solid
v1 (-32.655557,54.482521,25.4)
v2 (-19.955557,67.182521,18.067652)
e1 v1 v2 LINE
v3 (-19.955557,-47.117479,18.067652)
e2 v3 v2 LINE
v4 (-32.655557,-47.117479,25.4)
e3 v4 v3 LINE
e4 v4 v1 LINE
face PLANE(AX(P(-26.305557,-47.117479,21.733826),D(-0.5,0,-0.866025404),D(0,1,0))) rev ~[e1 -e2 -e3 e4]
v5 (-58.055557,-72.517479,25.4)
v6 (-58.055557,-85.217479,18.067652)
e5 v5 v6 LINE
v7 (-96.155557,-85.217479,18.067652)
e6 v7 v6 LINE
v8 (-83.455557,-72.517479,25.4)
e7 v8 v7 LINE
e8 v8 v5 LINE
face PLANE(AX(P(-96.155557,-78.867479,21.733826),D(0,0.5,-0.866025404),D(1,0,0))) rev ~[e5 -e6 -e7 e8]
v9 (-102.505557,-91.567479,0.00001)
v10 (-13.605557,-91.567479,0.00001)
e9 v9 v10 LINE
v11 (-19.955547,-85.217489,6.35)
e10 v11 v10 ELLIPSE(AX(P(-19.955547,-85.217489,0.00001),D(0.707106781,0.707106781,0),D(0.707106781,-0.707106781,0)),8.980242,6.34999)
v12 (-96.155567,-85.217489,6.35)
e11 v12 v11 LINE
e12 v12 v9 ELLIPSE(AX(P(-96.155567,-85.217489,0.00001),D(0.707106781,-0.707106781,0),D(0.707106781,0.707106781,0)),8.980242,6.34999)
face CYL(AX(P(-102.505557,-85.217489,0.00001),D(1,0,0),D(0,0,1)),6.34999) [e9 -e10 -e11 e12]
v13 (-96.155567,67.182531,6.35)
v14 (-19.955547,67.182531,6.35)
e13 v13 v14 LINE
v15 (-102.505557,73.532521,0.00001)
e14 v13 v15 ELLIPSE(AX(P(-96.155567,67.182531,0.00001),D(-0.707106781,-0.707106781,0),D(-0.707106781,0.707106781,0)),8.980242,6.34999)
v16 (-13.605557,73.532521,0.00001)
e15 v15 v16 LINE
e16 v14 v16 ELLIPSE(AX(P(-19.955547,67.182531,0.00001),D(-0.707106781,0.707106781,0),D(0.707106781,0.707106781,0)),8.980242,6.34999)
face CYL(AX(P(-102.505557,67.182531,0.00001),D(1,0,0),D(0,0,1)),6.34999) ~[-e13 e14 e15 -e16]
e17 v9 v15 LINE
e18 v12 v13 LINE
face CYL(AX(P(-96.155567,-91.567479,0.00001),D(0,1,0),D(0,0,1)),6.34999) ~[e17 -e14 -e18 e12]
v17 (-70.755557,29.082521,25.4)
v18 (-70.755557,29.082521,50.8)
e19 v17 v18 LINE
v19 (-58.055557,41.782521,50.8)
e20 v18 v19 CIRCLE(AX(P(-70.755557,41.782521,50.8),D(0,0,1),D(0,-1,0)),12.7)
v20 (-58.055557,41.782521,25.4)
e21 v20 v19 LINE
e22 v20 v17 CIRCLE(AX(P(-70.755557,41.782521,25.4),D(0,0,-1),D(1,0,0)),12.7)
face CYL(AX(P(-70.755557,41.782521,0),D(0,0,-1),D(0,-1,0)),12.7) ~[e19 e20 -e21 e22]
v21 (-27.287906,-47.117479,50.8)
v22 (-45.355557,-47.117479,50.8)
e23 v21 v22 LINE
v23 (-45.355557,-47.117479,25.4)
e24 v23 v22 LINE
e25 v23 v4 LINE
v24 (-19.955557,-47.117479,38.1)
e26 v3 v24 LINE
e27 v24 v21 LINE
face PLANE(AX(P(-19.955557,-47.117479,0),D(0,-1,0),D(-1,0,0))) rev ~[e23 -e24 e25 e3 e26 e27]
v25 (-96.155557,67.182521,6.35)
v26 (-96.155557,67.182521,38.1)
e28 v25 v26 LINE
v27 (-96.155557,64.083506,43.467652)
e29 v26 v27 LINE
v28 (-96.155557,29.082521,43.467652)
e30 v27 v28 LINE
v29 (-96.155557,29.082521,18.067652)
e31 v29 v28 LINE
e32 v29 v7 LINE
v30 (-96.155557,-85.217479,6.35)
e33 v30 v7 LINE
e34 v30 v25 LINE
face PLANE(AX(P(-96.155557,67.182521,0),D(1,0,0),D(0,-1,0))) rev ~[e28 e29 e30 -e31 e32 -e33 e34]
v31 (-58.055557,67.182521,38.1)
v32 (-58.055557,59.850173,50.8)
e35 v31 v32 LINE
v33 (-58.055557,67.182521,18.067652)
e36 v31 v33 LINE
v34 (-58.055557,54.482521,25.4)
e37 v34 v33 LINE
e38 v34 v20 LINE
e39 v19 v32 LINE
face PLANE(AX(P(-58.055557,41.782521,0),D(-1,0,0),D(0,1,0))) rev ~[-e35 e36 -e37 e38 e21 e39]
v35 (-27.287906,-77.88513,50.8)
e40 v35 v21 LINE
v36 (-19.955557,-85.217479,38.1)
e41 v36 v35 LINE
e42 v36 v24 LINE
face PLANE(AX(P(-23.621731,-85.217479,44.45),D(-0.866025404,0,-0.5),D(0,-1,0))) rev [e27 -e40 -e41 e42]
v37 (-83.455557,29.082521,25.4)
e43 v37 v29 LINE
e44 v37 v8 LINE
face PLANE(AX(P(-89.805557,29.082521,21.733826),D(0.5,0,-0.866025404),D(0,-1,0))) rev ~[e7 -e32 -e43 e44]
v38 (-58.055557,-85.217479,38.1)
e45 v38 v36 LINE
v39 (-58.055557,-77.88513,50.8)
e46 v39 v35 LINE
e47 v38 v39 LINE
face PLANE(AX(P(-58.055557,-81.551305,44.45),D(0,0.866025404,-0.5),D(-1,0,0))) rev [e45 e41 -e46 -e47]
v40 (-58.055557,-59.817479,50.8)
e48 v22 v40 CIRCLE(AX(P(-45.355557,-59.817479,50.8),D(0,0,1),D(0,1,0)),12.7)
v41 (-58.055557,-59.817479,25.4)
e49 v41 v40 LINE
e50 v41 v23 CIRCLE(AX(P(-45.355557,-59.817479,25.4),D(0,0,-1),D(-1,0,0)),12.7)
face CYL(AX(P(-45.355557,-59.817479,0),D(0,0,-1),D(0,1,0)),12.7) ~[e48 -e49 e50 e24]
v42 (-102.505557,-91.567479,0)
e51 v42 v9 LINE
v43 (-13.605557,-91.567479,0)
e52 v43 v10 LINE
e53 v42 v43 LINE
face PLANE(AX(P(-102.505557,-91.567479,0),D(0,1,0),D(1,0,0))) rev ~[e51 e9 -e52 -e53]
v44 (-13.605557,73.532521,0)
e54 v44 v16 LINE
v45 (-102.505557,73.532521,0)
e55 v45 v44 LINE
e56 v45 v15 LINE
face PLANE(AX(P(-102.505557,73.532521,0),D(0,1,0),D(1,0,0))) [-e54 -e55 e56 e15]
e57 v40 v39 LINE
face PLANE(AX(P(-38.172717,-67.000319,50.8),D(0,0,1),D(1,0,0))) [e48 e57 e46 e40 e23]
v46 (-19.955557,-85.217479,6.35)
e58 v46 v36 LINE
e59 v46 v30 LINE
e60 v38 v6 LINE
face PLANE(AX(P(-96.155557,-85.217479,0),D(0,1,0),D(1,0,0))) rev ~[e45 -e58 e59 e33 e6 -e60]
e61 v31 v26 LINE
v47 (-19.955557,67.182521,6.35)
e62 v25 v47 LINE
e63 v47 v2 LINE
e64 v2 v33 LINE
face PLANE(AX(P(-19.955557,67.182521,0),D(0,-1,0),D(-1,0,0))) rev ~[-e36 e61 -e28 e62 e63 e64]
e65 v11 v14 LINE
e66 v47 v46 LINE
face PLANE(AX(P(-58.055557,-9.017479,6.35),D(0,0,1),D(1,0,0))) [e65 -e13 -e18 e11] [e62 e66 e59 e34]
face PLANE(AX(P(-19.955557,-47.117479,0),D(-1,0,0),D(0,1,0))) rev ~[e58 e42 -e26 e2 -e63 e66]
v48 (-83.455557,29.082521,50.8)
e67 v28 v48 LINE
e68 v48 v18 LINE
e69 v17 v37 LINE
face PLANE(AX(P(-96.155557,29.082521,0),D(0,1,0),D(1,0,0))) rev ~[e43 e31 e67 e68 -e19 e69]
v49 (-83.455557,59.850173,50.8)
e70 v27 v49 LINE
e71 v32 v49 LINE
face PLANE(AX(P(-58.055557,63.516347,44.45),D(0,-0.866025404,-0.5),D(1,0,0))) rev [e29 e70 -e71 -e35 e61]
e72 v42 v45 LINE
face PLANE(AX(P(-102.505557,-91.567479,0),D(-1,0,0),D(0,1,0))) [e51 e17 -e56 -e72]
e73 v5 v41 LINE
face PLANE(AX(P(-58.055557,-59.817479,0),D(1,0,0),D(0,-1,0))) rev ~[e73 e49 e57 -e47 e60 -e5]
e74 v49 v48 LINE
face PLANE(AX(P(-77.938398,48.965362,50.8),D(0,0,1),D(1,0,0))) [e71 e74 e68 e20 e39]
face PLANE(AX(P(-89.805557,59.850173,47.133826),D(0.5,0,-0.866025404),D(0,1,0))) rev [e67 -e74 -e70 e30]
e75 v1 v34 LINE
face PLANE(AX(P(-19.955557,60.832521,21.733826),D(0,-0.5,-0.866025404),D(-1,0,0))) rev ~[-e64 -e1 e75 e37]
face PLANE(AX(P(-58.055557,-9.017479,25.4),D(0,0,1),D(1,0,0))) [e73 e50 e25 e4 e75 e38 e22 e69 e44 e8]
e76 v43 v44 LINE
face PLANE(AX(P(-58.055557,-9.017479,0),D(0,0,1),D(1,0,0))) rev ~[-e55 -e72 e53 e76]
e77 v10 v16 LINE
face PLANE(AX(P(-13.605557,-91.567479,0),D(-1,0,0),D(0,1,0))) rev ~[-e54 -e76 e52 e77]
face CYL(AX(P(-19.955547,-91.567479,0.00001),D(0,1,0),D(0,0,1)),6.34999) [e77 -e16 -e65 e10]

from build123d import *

# Parameters (mm, degrees)
F1_DEPTH    = 50.8
F2_DEPTH    = 25.4
F0_W        = 88.9
F0_H        = 165.1
F3_DEPTH    = 6.35
F4_SIZE2    = 7.3323484187
F4_SIZE     = 12.7
F5_C1_SIZE2 = 7.3323484187
F5_C1_SIZE  = 12.7
F5_C2_SIZE2 = 7.3323484187
F5_C2_SIZE  = 12.7
F5_C3_SIZE2 = 12.7
F5_C3_SIZE  = 7.3323484187
F5_C4_SIZE2 = 7.3323484187
F5_C4_SIZE  = 12.7
F6_R        = 6.34999


# Not quite as in the source:
# - a fillet or chamfer is up to 0.001 mm smaller than in the source, because OpenCascade refuses the exact size


with BuildPart() as f1:
    # F0 (on Top) → F1 (new body)
    with BuildSketch(Plane.XY):
        with BuildLine():
            Line((-19.9555572391, -85.2174787462), (-19.9555572391, -47.1174787462))
            Line((-19.9555572391, -47.1174787462), (-45.3555572391, -47.1174787462))
            ThreePointArc((-45.3555572391, -47.1174787462), (-54.3358133601, -50.8372226251), (-58.0555572391, -59.8174787462))
            Line((-58.0555572391, -59.8174787462), (-58.0555572391, -85.2174787462))
            Line((-58.0555572391, -85.2174787462), (-19.9555572391, -85.2174787462))
        make_face()
    extrude(amount=F1_DEPTH)



with BuildPart() as f1b:
    # F0 (on Top) → F1, piece 2 (new body)
    with BuildSketch(Plane.XY):
        with BuildLine():
            Line((-58.0555572391, 67.1825212538), (-96.1555572391, 67.1825212538))
            Line((-96.1555572391, 67.1825212538), (-96.1555572391, 29.0825212538))
            Line((-96.1555572391, 29.0825212538), (-70.7555572391, 29.0825212538))
            ThreePointArc((-70.7555572391, 29.0825212538), (-61.775301118, 32.8022651328), (-58.0555572391, 41.7825212538))
            Line((-58.0555572391, 41.7825212538), (-58.0555572391, 67.1825212538))
        make_face()
    extrude(amount=F1_DEPTH)


with BuildPart() as f1_1:
    add(f1.part)

    add(f1b.part)  # F2 merges F1b
    # F0 (on Top) → F2 (join)
    with BuildSketch(Plane.XY):
        with BuildLine():
            Line((-19.9555572391, 67.1825212538), (-58.0555572391, 67.1825212538))
            Line((-58.0555572391, 67.1825212538), (-58.0555572391, 41.7825212538))
            ThreePointArc((-58.0555572391, 41.7825212538), (-61.775301118, 32.8022651328), (-70.7555572391, 29.0825212538))
            Line((-70.7555572391, 29.0825212538), (-96.1555572391, 29.0825212538))
            Line((-96.1555572391, 29.0825212538), (-96.1555572391, -85.2174787462))
            Line((-96.1555572391, -85.2174787462), (-58.0555572391, -85.2174787462))
            Line((-58.0555572391, -85.2174787462), (-58.0555572391, -59.8174787462))
            ThreePointArc((-58.0555572391, -59.8174787462), (-54.3358133601, -50.8372226251), (-45.3555572391, -47.1174787462))
            Line((-45.3555572391, -47.1174787462), (-19.9555572391, -47.1174787462))
            Line((-19.9555572391, -47.1174787462), (-19.9555572391, 67.1825212538))
        make_face()
    extrude(amount=F2_DEPTH)

    # F0 (on Top) → F3 (join)
    with BuildSketch(Plane.XY):
        with Locations((-58.0555572391, -9.0174787462)):
            Rectangle(F0_W, F0_H)
        Polygon((-96.1555572391, 29.0825212538), (-96.1555572391, 67.1825212538), (-58.0555572391, 67.1825212538), (-19.9555572391, 67.1825212538), (-19.9555572391, -47.1174787462), (-19.9555572391, -85.2174787462), (-58.0555572391, -85.2174787462), (-96.1555572391, -85.2174787462), align=None, mode=Mode.SUBTRACT)
    extrude(amount=F3_DEPTH)

    # F4
    f4_edges = [f1_1.edges().sort_by_distance(p)[0] for p in [
        (-96.155557, -28.067479, 25.4),
        (-77.105557, -85.217479, 25.4),
        (-19.955557, 10.032521, 25.4),
        (-39.005557, 67.182521, 25.4),
    ]]
    f4_side = f1_1.faces().sort_by_distance((-58.055557, -9.017479, 25.4))[0]
    chamfer(f4_edges, length=F4_SIZE, length2=F4_SIZE2, reference=f4_side)

    # F5: chamfer of 12.7 x 7.3323484187 on 4 edges, made by hand

    # F5_c1
    f5_c1_edges = [f1_1.edges().sort_by_distance(p)[0] for p in [
        (-77.1055572391, 67.1825212538, 50.8),
    ]]
    f5_c1_side = f1_1.faces().sort_by_distance((-77.1055572391, 67.1825212538, 50.6533530316))[0]
    chamfer(f5_c1_edges, length=F5_C1_SIZE, length2=F5_C1_SIZE2, reference=f5_c1_side)

    # F5_c2
    f5_c2_edges = [f1_1.edges().sort_by_distance(p)[0] for p in [
        (-19.9555572391, -66.1674787462, 50.8),
    ]]
    f5_c2_side = f1_1.faces().sort_by_distance((-19.9555572391, -66.1674787462, 50.6533530316))[0]
    chamfer(f5_c2_edges, length=F5_C2_SIZE, length2=F5_C2_SIZE2, reference=f5_c2_side)

    # F5_c3
    f5_c3_edges = [f1_1.edges().sort_by_distance(p)[0] for p in [
        (-96.1555572391, 44.4663470445, 50.8),
    ]]
    f5_c3_side = f1_1.faces().sort_by_distance((-96.1555572391, 44.4663470445, 50.6533530316))[0]
    chamfer(f5_c3_edges, length=F5_C3_SIZE, length2=F5_C3_SIZE2, reference=f5_c3_side)

    # F5_c4
    f5_c4_edges = [f1_1.edges().sort_by_distance(p)[0] for p in [
        (-42.6717314484, -85.2174787462, 50.8),
    ]]
    f5_c4_side = f1_1.faces().sort_by_distance((-42.6717314484, -85.2174787462, 50.6533530316))[0]
    chamfer(f5_c4_edges, length=F5_C4_SIZE, length2=F5_C4_SIZE2, reference=f5_c4_side)

    # F6 (radius 6.35 in the source; OpenCascade refuses exactly that, so slightly less here)
    f6_edges = [f1_1.edges().sort_by_distance(p)[0] for p in [
        (-58.055557, -91.567479, 6.35),
        (-13.605557, -9.017479, 6.35),
        (-102.505557, -9.017479, 6.35),
        (-58.055557, 73.532521, 6.35),
    ]]
    fillet(f6_edges, radius=F6_R)


solid = f1_1.part
